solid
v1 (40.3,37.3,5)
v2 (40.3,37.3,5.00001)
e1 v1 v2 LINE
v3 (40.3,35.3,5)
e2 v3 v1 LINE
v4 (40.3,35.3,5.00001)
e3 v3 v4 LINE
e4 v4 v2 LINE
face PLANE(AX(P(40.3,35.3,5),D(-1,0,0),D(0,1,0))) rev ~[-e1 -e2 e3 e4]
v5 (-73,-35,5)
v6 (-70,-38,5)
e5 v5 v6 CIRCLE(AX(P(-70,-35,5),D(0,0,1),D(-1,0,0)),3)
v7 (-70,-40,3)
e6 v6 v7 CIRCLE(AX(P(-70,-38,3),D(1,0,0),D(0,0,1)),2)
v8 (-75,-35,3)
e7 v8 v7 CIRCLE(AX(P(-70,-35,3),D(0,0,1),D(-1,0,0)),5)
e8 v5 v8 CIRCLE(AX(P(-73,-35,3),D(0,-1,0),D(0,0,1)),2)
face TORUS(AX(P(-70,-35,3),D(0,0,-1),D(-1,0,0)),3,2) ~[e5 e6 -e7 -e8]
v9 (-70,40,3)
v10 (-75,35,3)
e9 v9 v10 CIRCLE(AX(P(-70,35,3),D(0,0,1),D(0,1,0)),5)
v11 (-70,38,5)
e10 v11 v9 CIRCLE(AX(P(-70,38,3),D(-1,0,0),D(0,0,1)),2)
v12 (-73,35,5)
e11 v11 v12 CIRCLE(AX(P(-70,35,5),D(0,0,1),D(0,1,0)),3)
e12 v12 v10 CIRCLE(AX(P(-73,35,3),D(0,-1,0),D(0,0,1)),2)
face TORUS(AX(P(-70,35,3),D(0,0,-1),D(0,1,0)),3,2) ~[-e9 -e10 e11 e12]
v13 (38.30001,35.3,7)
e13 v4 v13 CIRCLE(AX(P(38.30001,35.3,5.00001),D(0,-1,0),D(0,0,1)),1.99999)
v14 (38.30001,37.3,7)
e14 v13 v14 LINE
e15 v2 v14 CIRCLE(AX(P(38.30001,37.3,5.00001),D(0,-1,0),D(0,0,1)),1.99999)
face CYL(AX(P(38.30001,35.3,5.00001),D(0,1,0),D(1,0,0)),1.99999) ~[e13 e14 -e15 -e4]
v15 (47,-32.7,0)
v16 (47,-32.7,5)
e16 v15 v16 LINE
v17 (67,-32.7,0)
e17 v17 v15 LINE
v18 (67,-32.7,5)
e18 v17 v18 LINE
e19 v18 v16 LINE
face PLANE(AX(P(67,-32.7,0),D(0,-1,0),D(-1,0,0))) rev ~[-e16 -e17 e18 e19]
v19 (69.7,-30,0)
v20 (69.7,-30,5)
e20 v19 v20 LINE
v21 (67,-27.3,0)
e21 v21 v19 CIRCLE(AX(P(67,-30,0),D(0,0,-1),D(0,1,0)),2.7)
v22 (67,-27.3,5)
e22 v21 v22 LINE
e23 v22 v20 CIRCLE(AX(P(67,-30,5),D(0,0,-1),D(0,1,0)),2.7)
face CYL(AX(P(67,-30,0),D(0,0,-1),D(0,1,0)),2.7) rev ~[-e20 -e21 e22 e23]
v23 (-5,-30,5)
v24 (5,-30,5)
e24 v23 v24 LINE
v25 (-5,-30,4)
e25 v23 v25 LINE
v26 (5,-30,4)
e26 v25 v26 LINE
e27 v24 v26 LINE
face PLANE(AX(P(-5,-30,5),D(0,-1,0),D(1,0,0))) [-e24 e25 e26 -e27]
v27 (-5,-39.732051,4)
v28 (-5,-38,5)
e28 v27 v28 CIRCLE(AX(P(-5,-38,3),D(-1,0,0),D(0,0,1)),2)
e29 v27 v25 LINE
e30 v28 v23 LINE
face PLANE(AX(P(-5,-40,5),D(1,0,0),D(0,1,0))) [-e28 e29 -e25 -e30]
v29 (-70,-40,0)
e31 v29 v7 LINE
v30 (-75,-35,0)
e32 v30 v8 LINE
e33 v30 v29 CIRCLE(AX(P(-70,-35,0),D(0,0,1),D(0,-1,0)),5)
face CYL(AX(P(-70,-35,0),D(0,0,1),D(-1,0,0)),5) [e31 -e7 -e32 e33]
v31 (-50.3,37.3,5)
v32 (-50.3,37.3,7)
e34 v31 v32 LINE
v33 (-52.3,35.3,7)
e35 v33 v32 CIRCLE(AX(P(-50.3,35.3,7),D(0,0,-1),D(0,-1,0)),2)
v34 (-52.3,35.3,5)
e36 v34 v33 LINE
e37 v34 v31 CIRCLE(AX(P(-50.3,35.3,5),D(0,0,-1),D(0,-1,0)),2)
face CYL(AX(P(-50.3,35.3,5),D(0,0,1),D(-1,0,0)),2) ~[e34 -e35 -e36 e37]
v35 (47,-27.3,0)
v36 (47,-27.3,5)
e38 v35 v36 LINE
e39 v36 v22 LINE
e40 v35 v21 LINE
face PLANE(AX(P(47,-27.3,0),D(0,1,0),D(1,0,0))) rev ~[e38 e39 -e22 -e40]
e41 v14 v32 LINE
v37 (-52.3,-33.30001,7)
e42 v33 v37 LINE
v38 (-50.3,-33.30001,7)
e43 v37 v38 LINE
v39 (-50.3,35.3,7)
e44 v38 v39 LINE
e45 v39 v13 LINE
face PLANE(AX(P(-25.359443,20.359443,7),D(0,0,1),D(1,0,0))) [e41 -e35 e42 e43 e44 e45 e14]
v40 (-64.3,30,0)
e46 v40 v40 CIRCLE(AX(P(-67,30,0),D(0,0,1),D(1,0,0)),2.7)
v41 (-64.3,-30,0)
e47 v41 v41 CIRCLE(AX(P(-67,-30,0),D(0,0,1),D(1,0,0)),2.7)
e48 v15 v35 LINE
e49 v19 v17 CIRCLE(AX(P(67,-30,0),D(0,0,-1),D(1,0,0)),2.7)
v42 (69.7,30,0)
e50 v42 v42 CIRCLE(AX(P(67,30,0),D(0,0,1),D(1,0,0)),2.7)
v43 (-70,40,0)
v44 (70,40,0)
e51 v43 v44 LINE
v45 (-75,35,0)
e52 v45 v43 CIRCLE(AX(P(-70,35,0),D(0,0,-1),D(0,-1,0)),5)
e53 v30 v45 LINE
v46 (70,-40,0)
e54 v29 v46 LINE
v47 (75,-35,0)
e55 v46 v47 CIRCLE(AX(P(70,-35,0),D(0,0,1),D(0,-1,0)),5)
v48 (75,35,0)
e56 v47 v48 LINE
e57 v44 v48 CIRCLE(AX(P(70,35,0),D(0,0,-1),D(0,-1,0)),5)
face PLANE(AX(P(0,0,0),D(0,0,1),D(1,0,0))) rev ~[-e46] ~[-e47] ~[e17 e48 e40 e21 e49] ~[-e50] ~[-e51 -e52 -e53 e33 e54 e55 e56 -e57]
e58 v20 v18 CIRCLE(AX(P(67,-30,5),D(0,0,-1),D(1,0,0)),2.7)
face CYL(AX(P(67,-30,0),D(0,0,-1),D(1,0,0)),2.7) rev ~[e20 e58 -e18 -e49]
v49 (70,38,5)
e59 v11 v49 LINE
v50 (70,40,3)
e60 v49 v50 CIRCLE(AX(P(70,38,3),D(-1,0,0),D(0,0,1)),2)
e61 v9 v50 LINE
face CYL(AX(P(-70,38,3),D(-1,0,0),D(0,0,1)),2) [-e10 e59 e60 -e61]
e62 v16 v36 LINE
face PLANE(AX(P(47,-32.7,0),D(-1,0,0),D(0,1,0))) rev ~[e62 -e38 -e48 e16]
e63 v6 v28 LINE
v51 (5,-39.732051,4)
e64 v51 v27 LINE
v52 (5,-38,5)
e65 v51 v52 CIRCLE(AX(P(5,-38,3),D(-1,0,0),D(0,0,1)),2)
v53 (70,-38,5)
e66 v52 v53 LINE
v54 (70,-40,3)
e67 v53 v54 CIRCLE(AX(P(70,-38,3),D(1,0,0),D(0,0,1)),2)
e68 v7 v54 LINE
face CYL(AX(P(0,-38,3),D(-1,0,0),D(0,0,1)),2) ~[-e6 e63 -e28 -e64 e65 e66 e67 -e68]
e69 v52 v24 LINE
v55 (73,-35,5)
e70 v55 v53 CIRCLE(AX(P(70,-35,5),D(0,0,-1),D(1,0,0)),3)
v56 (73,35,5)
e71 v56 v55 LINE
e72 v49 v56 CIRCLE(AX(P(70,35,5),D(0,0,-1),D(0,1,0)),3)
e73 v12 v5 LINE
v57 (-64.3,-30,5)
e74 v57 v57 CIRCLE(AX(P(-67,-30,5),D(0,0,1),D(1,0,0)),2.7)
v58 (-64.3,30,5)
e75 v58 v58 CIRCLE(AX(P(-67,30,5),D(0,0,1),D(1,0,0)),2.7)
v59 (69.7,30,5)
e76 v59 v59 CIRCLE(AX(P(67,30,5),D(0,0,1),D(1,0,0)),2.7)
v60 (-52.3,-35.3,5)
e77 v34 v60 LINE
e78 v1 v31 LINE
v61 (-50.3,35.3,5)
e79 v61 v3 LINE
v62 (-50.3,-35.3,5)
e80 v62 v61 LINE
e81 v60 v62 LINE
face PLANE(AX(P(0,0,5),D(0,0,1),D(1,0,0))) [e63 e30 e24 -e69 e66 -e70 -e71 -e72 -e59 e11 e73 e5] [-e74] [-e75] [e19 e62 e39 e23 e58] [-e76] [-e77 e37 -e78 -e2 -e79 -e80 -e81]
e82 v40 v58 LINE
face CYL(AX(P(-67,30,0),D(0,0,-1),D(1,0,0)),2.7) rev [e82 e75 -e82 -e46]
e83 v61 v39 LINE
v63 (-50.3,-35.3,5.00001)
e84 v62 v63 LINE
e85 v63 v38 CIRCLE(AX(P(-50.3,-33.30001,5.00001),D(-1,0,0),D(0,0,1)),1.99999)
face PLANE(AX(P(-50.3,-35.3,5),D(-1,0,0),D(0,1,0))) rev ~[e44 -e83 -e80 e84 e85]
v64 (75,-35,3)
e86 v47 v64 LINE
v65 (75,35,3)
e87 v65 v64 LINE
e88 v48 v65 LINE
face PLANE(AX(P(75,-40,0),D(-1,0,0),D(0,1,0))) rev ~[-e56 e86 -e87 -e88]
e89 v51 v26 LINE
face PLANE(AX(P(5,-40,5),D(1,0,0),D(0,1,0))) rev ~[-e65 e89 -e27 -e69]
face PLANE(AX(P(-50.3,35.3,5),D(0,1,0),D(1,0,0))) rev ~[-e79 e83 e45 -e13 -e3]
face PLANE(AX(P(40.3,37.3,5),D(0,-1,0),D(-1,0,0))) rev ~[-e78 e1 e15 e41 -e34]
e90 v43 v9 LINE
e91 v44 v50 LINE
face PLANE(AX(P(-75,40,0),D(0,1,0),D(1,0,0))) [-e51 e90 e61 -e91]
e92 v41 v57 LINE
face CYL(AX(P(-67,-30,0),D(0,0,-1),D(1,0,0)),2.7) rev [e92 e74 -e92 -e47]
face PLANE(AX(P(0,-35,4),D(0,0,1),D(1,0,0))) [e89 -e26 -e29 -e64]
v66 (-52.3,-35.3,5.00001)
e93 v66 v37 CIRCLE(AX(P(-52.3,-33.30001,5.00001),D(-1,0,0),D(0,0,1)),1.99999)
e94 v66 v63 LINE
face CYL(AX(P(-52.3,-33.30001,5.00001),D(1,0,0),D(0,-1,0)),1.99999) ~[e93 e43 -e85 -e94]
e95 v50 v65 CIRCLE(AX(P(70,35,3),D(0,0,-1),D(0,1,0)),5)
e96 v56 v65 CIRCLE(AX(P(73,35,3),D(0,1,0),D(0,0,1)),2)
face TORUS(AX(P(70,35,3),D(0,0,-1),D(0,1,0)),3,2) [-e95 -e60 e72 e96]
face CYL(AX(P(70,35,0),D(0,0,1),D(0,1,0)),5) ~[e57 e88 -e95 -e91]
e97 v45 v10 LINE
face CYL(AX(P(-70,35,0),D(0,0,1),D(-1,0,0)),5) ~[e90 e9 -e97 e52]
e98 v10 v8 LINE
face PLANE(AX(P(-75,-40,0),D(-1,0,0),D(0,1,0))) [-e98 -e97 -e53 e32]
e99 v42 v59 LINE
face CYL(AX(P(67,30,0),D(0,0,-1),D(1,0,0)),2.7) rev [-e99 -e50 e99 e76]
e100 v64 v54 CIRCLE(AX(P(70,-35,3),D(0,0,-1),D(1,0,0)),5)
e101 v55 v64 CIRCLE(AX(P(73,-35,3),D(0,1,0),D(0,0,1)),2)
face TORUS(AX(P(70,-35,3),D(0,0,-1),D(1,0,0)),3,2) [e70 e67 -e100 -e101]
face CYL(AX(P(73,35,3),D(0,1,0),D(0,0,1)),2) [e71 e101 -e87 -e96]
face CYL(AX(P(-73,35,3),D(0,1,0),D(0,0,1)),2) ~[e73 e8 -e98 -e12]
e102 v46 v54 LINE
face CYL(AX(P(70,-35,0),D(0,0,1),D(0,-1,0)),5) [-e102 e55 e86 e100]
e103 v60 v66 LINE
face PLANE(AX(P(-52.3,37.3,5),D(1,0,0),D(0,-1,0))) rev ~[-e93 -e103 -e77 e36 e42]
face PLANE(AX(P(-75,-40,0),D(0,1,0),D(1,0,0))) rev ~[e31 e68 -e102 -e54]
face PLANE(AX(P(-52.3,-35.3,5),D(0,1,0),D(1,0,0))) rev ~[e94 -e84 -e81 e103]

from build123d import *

# Parameters (mm, degrees)
F0_W         = 150
F0_H         = 80
F0_R         = 2.7
F1_DEPTH     = 5
F3_DEPTH     = 2
F4_R         = 5
F5_R         = 1.99999
F6_R         = 2
F7_W         = 10
F7_H         = 10
F8_DEPTH     = 1
F9_T1_DEPTH  = 70
F9_T3_DEPTH  = 140
F9_T5_DEPTH  = 70
F9_T7_DEPTH  = 70
F9_T10_ANGLE = 90
F9_T12_ANGLE = 90
F9_T14_ANGLE = 90
F9_T16_ANGLE = 90


# Not quite as in the source:
# - a fillet or chamfer that OpenCascade refuses, or shapes differently, is made with other operations: its cross-section is extruded or revolved along the edge and cut away or added
# - a fillet or chamfer is up to 0.001 mm smaller than in the source, because OpenCascade refuses the exact size
# - a feature names something its author has since deleted; it is built from what else it names


with BuildPart() as f1:
    # F0 (on Top) → F1 (new body)
    with BuildSketch(Plane.XY):
        Rectangle(F0_W, F0_H)
        with Locations((-67, -30)):
            Circle(F0_R, mode=Mode.SUBTRACT)
        with BuildLine():
            ThreePointArc((67, -27.3), (68.9091883092, -28.0908116908), (69.7, -30))
            ThreePointArc((69.7, -30), (68.9091883092, -31.9091883092), (67, -32.7))
            Line((67, -32.7), (47, -32.7))
            Line((47, -32.7), (47, -27.3))
            Line((47, -27.3), (67, -27.3))
        make_face(mode=Mode.SUBTRACT)
        with Locations((-67, 30)):
            Circle(F0_R, mode=Mode.SUBTRACT)
        with Locations((67, 30)):
            Circle(F0_R, mode=Mode.SUBTRACT)
    extrude(amount=F1_DEPTH)

    # F2 (on face) → F3 (join)
    with BuildSketch(Plane.XY.offset(5)):
        Polygon((-50.3, -35.3), (-50.3, 35.3), (40.3, 35.3), (40.3, 37.3), (-52.3, 37.3), (-52.3, -35.3), align=None)
    extrude(amount=F3_DEPTH)

    # F4
    f4_edges = [f1.edges().sort_by_distance(p)[0] for p in [
        (75, -40, 2.5),
        (-75, -40, 2.5),
        (-75, 40, 2.5),
        (75, 40, 2.5),
    ]]
    fillet(f4_edges, radius=F4_R)

    # F5 (radius 2 in the source; OpenCascade refuses exactly that, so slightly less here)
    f5_edges = [f1.edges().sort_by_distance(p)[0] for p in [
        (-51.3, -35.3, 7),
        (40.3, 36.3, 7),
    ]]
    fillet(f5_edges, radius=F5_R)

    # F6
    f6_edges = [f1.edges().sort_by_distance(p)[0] for p in [
        (-52.3, 37.3, 6),
    ]]
    fillet(f6_edges, radius=F6_R)

    # F7 (on face) → F8 (cut)
    with BuildSketch(Plane.XY.offset(5)):
        with Locations((0, -35)):
            Rectangle(F7_W, F7_H)
    extrude(amount=-F8_DEPTH, mode=Mode.SUBTRACT)

    # F9: fillet of radius 2 on 7 edges, made by hand

    # F9_s2 → F9_t1 (cut)
    with BuildSketch(Plane.XZ.offset(-35)):
        with BuildLine():
            ThreePointArc((-73, 5), (-74.4142135624, 4.4142135624), (-75, 3))
            Line((-75, 3), (-75, 5))
            Line((-75, 5), (-73, 5))
        make_face()
        with BuildLine():
            ThreePointArc((73, 5), (74.4142135624, 4.4142135624), (75, 3))
            Line((75, 3), (75, 5))
            Line((75, 5), (73, 5))
        make_face()
    extrude(amount=F9_T1_DEPTH, mode=Mode.SUBTRACT)

    # F9_s4 → F9_t3 (cut)
    with BuildSketch(Plane.YZ.offset(-70)):
        with BuildLine():
            ThreePointArc((38, 5), (39.4142135624, 4.4142135624), (40, 3))
            Line((40, 3), (40, 5))
            Line((40, 5), (38, 5))
        make_face()
    extrude(amount=F9_T3_DEPTH, mode=Mode.SUBTRACT)

    # F9_s6 → F9_t5 (cut)
    with BuildSketch(Plane.YZ):
        with BuildLine():
            ThreePointArc((-38, 5), (-39.4142135624, 4.4142135624), (-40, 3))
            Line((-40, 3), (-40, 5))
            Line((-40, 5), (-38, 5))
        make_face()
    extrude(amount=F9_T5_DEPTH, mode=Mode.SUBTRACT)

    # F9_s8 → F9_t7 (cut)
    with BuildSketch(Plane.YZ.offset(-70)):
        with BuildLine():
            ThreePointArc((-38, 5), (-39.4142135624, 4.4142135624), (-40, 3))
            Line((-40, 3), (-40, 5))
            Line((-40, 5), (-38, 5))
        make_face()
    extrude(amount=F9_T7_DEPTH, mode=Mode.SUBTRACT)

    # F9_s9 → F9_t10 (revolve, cut)
    with BuildSketch(Plane.XZ.offset(35)):
        with BuildLine():
            ThreePointArc((-73, 5), (-74.4142135624, 4.4142135624), (-75, 3))
            Line((-75, 3), (-75, 5))
            Line((-75, 5), (-73, 5))
        make_face()
    revolve(axis=Axis((-70, -35, 5), (0, 0, 1)), revolution_arc=F9_T10_ANGLE, mode=Mode.SUBTRACT)

    # F9_s11 → F9_t12 (revolve, cut)
    with BuildSketch(Plane.XZ.offset(35)):
        with BuildLine():
            ThreePointArc((73, 5), (74.4142135624, 4.4142135624), (75, 3))
            Line((75, 3), (75, 5))
            Line((75, 5), (73, 5))
        make_face()
    revolve(axis=Axis((70, -35, 5), (0, 0, -1)), revolution_arc=F9_T12_ANGLE, mode=Mode.SUBTRACT)

    # F9_s13 → F9_t14 (revolve, cut)
    with BuildSketch(Plane.YZ.offset(70)):
        with BuildLine():
            ThreePointArc((38, 5), (39.4142135624, 4.4142135624), (40, 3))
            Line((40, 3), (40, 5))
            Line((40, 5), (38, 5))
        make_face()
    revolve(axis=Axis((70, 35, 5), (0, 0, -1)), revolution_arc=F9_T14_ANGLE, mode=Mode.SUBTRACT)

    # F9_s15 → F9_t16 (revolve, cut)
    with BuildSketch(Plane.YZ.offset(-70)):
        with BuildLine():
            ThreePointArc((38, 5), (39.4142135624, 4.4142135624), (40, 3))
            Line((40, 3), (40, 5))
            Line((40, 5), (38, 5))
        make_face()
    revolve(axis=Axis((-70, 35, 5), (0, 0, 1)), revolution_arc=F9_T16_ANGLE, mode=Mode.SUBTRACT)


solid = f1.part
